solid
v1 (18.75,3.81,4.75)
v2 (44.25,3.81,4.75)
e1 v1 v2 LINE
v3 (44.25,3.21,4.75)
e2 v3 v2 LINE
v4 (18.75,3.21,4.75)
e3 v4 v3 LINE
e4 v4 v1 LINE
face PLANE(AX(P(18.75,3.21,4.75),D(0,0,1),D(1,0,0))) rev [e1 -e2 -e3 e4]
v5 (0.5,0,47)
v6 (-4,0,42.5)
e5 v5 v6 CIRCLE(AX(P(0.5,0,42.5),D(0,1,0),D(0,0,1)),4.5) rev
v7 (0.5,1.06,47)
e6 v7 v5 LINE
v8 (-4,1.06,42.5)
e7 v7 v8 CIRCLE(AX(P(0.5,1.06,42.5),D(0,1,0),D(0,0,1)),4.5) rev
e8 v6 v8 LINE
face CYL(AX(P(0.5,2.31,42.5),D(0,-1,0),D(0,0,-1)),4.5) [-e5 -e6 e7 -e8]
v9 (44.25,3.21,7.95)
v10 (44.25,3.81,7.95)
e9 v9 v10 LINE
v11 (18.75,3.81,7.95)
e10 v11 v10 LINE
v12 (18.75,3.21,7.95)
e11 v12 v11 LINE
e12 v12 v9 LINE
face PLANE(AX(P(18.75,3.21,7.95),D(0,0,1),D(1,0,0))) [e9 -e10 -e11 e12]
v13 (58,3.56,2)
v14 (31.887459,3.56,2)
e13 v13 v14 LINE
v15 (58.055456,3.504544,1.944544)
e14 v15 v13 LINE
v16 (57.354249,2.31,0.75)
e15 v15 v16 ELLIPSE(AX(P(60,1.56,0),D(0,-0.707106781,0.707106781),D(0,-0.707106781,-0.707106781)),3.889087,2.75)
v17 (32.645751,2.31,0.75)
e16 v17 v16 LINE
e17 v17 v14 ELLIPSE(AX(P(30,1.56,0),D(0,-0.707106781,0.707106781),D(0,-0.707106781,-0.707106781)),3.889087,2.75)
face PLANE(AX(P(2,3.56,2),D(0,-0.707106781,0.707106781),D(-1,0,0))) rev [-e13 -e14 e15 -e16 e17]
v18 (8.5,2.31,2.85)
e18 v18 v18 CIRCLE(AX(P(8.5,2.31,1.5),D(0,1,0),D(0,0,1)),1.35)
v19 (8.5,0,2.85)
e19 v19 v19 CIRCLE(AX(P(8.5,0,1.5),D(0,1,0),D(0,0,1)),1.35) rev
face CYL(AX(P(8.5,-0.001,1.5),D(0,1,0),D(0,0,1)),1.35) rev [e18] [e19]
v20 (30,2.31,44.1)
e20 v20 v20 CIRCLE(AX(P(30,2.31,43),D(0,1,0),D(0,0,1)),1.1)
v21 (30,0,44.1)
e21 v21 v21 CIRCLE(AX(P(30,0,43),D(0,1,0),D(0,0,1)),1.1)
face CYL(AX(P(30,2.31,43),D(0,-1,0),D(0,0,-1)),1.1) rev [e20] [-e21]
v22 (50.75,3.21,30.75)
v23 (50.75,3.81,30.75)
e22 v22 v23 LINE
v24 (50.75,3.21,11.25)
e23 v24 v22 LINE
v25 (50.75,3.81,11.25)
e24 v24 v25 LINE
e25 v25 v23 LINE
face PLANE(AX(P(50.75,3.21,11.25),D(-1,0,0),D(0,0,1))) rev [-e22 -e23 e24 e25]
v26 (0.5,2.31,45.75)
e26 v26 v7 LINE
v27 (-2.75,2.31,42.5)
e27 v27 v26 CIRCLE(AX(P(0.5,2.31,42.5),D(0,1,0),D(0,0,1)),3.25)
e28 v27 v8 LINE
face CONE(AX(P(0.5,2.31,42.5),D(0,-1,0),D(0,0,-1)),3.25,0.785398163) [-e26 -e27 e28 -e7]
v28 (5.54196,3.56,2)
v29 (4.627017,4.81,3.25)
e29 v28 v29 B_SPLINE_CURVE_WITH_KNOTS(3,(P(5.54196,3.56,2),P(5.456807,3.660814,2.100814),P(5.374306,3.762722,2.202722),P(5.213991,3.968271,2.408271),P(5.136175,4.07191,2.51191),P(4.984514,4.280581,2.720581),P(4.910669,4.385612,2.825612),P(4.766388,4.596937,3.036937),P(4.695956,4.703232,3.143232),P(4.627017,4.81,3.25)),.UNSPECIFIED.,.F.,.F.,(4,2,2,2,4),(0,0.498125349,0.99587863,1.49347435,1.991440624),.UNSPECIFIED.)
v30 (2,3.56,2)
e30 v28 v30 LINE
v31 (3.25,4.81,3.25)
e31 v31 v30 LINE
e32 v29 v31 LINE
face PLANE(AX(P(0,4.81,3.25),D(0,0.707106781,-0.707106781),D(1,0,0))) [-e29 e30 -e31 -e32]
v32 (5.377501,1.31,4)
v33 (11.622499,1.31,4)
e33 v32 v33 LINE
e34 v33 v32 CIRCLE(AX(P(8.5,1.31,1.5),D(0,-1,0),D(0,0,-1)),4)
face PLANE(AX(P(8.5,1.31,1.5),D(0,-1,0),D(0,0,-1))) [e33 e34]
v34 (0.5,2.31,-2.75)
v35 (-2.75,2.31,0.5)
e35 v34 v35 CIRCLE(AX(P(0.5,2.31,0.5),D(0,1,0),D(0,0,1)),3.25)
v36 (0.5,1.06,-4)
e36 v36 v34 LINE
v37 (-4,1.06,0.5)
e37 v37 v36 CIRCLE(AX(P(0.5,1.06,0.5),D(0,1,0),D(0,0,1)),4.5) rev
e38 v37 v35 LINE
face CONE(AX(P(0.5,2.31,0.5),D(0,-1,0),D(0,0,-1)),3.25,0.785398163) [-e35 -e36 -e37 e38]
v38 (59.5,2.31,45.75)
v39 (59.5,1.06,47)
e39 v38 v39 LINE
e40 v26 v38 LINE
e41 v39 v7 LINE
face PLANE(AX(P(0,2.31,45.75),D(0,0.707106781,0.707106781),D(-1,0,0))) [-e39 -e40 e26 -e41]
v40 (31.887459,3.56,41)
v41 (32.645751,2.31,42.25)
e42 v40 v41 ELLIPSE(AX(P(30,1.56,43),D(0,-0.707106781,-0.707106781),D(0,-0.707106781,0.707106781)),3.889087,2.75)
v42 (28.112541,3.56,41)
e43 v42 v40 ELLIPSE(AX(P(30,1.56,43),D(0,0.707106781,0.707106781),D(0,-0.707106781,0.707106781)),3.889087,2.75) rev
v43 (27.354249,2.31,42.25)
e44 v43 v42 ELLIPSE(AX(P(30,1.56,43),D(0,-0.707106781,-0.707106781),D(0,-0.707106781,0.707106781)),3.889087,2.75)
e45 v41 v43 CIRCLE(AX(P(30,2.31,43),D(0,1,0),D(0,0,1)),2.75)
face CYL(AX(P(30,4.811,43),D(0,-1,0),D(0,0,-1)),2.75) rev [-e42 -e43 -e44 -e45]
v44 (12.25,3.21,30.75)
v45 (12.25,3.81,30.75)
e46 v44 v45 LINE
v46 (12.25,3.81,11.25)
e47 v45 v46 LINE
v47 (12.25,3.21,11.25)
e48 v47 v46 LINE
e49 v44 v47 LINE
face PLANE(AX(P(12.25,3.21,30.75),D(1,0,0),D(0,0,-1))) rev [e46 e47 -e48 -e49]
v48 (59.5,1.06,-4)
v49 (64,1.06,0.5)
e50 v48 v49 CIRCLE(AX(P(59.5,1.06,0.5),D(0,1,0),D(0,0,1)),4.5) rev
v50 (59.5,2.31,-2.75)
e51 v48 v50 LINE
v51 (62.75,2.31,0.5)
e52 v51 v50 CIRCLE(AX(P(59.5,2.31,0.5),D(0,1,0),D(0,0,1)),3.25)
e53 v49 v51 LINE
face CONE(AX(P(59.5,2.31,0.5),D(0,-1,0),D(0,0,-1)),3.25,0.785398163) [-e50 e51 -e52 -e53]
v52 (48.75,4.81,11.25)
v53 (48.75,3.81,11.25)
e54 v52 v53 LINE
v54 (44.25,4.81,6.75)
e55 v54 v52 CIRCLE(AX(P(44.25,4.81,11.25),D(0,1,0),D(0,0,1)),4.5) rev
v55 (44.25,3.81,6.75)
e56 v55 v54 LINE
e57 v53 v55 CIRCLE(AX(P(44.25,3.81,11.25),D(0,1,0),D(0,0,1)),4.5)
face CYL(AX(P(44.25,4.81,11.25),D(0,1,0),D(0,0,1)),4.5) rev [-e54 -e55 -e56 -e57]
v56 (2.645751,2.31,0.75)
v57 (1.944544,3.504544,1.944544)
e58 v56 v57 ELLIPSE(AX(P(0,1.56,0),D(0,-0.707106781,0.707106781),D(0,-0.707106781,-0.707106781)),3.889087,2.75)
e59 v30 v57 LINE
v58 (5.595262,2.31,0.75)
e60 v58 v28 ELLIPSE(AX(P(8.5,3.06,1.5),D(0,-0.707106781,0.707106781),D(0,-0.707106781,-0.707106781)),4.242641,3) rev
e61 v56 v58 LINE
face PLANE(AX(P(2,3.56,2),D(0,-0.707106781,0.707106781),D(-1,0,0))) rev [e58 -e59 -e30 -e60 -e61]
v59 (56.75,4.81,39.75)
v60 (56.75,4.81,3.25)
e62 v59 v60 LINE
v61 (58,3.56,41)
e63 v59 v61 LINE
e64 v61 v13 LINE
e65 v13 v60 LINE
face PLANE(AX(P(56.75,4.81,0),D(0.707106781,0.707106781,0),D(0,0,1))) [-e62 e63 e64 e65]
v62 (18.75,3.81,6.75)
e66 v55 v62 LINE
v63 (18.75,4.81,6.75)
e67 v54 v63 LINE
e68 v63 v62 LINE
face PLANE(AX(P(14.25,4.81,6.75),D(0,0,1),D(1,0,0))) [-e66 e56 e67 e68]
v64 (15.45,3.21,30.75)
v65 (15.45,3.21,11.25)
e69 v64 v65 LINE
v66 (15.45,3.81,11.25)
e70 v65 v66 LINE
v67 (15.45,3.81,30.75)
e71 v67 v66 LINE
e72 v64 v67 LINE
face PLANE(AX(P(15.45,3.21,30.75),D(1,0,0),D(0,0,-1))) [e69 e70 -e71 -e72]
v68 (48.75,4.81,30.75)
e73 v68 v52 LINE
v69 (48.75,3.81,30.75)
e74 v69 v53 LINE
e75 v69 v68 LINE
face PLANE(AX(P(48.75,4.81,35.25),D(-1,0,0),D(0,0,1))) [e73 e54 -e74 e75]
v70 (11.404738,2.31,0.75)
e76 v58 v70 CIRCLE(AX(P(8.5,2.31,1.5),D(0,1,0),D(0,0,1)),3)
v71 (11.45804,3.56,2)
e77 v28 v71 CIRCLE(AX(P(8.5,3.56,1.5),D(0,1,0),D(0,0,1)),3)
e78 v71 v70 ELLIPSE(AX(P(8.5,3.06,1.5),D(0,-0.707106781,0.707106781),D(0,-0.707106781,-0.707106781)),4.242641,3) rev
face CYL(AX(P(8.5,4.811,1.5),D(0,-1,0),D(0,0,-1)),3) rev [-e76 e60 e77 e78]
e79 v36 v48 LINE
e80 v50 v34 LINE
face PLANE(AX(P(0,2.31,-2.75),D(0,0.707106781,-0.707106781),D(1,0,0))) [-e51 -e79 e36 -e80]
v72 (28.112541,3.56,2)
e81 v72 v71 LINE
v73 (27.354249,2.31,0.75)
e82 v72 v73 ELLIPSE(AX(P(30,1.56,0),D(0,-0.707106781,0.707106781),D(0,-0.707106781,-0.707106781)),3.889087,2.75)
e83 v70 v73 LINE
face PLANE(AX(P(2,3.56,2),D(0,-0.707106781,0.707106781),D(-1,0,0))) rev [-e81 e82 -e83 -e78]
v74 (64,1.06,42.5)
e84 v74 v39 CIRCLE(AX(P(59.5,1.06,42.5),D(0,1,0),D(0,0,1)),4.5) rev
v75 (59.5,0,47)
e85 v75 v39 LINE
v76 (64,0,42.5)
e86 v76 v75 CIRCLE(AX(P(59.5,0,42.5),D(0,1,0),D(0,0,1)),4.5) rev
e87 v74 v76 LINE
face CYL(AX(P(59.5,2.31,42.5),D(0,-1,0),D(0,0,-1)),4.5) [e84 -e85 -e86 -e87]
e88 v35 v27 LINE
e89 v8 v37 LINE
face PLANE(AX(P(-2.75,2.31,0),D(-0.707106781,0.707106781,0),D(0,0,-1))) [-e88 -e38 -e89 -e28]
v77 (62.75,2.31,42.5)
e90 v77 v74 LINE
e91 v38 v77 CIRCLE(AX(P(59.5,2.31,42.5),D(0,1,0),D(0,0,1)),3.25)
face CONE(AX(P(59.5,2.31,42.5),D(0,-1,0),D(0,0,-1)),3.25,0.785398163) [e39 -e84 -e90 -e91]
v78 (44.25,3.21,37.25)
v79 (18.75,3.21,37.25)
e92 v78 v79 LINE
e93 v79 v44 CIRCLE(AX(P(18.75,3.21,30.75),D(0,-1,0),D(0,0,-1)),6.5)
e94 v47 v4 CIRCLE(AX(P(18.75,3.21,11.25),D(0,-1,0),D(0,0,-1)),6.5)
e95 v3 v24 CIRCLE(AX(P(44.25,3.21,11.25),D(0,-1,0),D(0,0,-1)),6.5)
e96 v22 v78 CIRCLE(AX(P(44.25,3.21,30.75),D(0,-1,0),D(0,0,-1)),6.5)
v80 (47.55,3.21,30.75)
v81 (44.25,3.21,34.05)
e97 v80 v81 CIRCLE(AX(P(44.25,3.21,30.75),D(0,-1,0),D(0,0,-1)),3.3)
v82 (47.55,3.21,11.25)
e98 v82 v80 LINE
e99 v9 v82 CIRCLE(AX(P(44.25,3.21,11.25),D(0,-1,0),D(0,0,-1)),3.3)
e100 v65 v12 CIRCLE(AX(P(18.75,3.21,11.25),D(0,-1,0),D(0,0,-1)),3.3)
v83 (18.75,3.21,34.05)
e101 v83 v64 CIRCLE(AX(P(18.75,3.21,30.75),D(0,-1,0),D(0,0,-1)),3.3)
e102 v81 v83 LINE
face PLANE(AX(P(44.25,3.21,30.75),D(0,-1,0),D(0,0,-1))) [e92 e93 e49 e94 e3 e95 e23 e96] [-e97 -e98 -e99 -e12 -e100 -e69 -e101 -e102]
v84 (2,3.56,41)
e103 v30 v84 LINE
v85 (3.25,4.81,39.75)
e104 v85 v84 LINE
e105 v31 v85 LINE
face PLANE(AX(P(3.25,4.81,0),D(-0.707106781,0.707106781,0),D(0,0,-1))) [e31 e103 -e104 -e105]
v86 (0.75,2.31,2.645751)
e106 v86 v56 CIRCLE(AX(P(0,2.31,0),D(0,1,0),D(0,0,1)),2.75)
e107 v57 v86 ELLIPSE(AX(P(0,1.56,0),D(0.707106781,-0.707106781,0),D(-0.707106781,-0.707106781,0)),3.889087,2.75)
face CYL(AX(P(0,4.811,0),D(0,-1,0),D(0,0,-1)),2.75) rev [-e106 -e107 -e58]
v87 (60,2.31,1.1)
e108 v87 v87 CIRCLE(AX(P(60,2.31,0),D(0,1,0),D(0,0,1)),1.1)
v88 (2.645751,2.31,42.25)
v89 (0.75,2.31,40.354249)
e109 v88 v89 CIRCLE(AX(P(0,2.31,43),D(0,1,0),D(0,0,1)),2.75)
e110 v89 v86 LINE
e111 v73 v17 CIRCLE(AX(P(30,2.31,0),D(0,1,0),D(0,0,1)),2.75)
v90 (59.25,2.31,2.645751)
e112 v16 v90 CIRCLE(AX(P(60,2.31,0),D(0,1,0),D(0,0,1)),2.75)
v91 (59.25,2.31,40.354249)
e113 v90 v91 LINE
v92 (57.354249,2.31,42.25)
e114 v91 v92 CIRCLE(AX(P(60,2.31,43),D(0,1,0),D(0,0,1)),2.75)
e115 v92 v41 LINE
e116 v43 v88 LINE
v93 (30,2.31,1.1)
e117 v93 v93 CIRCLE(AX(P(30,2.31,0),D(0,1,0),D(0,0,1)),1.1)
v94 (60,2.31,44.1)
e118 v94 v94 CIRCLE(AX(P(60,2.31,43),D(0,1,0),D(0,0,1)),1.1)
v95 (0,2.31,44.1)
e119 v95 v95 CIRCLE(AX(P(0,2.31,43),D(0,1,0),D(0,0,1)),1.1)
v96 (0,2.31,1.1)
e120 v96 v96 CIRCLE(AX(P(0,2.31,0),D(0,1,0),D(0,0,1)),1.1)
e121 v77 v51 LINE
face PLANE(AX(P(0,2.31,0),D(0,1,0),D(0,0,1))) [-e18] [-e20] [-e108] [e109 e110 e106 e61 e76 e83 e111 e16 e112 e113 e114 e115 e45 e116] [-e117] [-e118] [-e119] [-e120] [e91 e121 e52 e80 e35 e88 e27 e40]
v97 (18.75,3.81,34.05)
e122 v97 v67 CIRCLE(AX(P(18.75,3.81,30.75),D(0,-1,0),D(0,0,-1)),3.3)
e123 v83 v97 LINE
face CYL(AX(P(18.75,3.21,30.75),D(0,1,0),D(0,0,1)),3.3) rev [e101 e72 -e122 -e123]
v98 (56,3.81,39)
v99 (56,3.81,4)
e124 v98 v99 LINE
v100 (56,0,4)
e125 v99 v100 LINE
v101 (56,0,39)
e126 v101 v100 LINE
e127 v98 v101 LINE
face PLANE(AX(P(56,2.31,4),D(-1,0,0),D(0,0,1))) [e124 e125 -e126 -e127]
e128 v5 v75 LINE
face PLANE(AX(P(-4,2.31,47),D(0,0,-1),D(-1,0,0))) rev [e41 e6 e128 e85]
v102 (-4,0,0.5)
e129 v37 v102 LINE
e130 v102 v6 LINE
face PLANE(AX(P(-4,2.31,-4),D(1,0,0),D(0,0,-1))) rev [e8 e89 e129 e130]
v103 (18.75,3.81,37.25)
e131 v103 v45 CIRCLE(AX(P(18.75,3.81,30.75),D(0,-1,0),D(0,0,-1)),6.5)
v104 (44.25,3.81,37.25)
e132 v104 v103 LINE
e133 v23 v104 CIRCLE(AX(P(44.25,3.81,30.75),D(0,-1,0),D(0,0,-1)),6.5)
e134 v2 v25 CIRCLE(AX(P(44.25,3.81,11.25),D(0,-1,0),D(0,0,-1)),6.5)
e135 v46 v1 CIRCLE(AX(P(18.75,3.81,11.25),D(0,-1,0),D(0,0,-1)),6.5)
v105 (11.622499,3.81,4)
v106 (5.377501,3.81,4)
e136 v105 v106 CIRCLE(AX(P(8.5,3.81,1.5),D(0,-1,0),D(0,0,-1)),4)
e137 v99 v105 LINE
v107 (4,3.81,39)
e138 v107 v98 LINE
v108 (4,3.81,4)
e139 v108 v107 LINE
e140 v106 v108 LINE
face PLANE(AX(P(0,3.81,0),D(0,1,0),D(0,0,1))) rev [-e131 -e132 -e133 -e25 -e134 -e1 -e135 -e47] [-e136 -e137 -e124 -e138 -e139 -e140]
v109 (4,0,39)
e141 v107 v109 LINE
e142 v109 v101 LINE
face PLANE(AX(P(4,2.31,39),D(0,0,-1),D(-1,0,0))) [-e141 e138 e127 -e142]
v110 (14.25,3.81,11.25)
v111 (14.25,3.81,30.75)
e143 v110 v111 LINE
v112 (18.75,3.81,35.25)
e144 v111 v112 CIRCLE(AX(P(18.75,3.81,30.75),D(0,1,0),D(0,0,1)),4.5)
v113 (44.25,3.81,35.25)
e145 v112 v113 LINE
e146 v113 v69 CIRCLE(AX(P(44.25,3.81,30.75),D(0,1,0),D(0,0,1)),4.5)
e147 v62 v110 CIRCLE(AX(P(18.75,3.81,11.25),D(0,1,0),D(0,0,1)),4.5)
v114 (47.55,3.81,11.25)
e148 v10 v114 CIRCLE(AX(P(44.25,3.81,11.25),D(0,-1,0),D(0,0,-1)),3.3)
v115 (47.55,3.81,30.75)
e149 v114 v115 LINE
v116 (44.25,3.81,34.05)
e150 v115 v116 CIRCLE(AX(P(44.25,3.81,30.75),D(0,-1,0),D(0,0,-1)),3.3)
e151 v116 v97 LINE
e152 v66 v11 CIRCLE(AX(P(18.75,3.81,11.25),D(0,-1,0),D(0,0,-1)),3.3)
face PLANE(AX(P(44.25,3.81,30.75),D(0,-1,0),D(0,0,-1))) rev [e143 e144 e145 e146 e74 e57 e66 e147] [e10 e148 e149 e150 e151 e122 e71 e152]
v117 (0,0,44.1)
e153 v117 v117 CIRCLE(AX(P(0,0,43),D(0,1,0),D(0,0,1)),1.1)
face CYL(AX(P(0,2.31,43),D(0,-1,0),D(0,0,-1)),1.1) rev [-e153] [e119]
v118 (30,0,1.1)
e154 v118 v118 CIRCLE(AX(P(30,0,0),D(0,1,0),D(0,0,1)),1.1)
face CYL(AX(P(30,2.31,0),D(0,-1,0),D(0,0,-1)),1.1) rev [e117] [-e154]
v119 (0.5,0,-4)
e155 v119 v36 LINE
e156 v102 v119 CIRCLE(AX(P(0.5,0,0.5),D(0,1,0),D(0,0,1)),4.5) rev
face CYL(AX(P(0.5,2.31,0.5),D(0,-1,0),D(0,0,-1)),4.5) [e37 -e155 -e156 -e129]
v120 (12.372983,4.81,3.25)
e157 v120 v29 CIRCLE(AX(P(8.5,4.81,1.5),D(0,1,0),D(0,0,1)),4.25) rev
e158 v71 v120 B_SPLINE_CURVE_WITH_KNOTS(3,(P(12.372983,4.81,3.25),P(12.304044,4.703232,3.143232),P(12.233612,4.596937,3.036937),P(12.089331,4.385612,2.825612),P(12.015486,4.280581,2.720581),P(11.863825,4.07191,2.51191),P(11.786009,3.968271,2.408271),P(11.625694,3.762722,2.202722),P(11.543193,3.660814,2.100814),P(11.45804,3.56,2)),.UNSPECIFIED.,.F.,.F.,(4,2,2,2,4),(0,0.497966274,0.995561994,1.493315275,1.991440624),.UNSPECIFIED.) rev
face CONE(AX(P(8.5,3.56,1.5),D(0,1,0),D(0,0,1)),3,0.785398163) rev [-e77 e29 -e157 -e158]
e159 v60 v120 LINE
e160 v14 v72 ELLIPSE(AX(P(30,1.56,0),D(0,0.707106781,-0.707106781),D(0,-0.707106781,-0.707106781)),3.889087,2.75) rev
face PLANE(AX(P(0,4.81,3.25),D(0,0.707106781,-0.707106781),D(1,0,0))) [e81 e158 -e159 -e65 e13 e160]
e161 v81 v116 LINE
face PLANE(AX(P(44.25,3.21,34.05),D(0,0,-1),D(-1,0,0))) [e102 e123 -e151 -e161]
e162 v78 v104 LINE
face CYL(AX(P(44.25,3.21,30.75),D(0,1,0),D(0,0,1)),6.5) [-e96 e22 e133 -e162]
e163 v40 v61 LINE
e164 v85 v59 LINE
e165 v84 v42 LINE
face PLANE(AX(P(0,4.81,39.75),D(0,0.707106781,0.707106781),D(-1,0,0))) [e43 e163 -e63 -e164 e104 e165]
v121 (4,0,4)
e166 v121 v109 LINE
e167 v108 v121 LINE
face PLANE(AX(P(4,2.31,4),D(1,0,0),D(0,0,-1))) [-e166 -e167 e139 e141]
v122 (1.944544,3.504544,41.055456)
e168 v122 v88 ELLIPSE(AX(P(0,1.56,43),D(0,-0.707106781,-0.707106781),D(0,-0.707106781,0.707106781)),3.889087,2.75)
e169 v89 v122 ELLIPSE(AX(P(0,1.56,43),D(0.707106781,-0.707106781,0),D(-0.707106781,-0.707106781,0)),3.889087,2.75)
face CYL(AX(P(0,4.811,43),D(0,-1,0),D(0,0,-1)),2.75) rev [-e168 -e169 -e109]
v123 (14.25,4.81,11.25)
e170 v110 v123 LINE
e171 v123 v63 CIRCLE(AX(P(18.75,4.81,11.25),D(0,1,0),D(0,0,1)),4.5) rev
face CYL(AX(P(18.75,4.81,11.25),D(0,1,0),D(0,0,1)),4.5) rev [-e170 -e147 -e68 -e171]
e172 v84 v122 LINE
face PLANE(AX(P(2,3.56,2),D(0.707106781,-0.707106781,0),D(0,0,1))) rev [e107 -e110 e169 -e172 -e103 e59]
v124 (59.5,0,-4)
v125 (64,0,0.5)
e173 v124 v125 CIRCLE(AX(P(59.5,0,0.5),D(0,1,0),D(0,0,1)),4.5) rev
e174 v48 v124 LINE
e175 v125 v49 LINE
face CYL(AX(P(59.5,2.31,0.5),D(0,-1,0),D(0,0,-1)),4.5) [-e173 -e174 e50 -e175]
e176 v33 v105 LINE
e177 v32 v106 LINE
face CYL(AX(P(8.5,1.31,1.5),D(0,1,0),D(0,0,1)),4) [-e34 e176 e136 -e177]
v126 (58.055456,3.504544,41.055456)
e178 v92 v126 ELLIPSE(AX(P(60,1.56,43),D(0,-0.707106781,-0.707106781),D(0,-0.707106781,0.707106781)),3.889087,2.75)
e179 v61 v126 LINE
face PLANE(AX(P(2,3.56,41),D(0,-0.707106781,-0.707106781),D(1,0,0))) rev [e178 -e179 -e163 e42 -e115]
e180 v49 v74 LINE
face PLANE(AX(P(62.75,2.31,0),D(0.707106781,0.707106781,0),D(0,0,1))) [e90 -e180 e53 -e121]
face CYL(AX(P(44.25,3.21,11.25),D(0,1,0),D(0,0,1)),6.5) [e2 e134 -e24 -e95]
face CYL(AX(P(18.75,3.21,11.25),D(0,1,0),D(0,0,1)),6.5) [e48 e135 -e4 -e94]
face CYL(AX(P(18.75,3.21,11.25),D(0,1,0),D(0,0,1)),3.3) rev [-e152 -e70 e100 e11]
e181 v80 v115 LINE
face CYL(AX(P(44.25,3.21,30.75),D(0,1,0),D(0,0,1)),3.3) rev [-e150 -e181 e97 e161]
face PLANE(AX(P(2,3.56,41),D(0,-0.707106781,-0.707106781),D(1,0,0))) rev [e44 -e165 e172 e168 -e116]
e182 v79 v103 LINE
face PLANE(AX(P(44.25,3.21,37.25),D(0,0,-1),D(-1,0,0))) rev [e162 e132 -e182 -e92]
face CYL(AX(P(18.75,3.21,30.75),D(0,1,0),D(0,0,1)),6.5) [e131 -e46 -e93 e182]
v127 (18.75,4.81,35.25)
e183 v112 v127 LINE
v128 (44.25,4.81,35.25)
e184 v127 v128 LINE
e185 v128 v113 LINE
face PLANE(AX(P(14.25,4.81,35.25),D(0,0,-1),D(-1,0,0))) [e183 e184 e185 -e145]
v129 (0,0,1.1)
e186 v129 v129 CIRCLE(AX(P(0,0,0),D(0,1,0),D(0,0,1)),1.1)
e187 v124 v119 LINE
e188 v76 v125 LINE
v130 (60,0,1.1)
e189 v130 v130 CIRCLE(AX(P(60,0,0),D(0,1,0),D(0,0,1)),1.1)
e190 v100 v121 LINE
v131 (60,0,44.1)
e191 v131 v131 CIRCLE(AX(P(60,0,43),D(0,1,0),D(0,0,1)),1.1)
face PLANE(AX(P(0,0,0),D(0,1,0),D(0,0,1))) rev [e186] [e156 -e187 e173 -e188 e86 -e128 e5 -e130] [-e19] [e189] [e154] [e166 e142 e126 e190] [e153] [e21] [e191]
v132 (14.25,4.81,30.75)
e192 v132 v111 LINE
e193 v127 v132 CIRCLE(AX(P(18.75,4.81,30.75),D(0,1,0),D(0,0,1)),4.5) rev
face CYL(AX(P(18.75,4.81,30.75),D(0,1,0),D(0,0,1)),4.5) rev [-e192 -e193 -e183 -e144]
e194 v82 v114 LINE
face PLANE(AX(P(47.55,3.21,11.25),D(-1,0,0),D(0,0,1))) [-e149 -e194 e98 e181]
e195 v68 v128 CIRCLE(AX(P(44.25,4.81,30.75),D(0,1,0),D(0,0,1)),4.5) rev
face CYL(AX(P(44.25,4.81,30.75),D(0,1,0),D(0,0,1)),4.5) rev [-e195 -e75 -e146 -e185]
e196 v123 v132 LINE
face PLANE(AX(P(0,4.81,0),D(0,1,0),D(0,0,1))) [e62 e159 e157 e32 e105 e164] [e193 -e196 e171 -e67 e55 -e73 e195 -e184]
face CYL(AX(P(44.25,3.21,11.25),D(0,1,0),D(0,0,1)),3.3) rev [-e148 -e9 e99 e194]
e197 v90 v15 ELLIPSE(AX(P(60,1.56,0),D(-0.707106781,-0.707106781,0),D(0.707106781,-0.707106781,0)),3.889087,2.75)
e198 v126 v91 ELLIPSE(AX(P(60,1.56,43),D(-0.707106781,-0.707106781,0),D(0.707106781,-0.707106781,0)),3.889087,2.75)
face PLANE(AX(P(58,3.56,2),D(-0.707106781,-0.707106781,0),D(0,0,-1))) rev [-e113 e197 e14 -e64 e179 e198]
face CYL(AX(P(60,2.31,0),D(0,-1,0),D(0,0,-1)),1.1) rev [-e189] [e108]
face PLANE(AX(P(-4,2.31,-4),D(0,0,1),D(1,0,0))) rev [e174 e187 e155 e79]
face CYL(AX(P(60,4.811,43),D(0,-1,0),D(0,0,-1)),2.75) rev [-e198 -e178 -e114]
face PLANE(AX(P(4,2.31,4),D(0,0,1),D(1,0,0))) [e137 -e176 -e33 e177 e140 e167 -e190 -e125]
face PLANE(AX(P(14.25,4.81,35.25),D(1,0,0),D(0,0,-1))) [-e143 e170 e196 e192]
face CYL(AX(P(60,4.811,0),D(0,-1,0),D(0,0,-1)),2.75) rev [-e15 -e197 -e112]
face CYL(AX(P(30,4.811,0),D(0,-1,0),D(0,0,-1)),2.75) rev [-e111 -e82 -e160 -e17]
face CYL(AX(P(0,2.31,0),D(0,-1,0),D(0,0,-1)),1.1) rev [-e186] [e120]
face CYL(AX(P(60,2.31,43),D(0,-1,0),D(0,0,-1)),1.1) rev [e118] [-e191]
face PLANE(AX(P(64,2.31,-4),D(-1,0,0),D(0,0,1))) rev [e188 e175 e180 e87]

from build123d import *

# Parameters (mm, degrees)
SKETCH_1_W          = 68
SKETCH_1_H          = 51
SKETCH_1_R          = 1.1
SKETCH_1_W_2        = 52
SKETCH_1_H_2        = 35
EXTRUDE_1_DEPTH     = 2.31
SKETCH_2_W          = 56
SKETCH_2_H          = 39
SKETCH_2_W_2        = 52
SKETCH_2_H_2        = 35
EXTRUDE_2_DEPTH     = 1.5
CUT_EXTRUDE_1_REACH = 81.438
SKETCH_3_R          = 1.35
SKETCH_4_W          = 56
SKETCH_4_H          = 39
SKETCH_4_W_2        = 34.5
SKETCH_4_H_2        = 28.5
EXTRUDE_3_DEPTH     = 1
CUT_EXTRUDE_2_REACH = 81.443
SKETCH_5_R          = 3
EXTRUDE_START       = 2.5
EXTRUDE_4_DEPTH     = 2.5
EXTRUDE_5_DEPTH     = 1
FILLET_1_R          = 4.5
CHAMFER_1_SIZE      = 1.25
CUT_EXTRUDE_3_REACH = 81.443
SKETCH_9_R          = 2.75
EXTRUDE_6_DEPTH     = 0.6


with BuildPart() as part:
    # 草图1 → 凸台-拉伸1 (new body)
    with BuildSketch(Plane(origin=(0, 0, 0), x_dir=(1, 0, 0), z_dir=(0, 1, 0))):
        with Locations((30, -21.5)):
            Rectangle(SKETCH_1_W, SKETCH_1_H)
        with Locations(Location((0, 0, 0), (0, 0, 270))):
            Circle(SKETCH_1_R, mode=Mode.SUBTRACT)
        with Locations(Location((60, 0, 0), (0, 0, 270))):
            Circle(SKETCH_1_R, mode=Mode.SUBTRACT)
        with Locations(Location((30, 0, 0), (0, 0, 270))):
            Circle(SKETCH_1_R, mode=Mode.SUBTRACT)
        with Locations(Location((0, -43, 0), (0, 0, 270))):
            Circle(SKETCH_1_R, mode=Mode.SUBTRACT)
        with Locations(Location((60, -43, 0), (0, 0, 270))):
            Circle(SKETCH_1_R, mode=Mode.SUBTRACT)
        with Locations(Location((30, -43, 0), (0, 0, 270))):
            Circle(SKETCH_1_R, mode=Mode.SUBTRACT)
        with Locations((30, -21.5)):
            Rectangle(SKETCH_1_W_2, SKETCH_1_H_2, mode=Mode.SUBTRACT)
    extrude(amount=EXTRUDE_1_DEPTH)

    # 草图2 → 凸台-拉伸2 (add)
    with BuildSketch(Plane(origin=(0, 2.31, 0), x_dir=(1, 0, 0), z_dir=(0, 1, 0))):
        with Locations((30, -21.5)):
            Rectangle(SKETCH_2_W, SKETCH_2_H)
        with Locations((30, -21.5)):
            Rectangle(SKETCH_2_W_2, SKETCH_2_H_2, mode=Mode.SUBTRACT)
    extrude(amount=EXTRUDE_2_DEPTH)

    # 草图3 → 切除-拉伸1 (cut, up to next)
    with BuildSketch(Plane(origin=(0, 2.31, 0), x_dir=(1, 0, 0), z_dir=(0, 1, 0)), mode=Mode.PRIVATE) as cut_extrude_1_sk1:
        with Locations(Location((8.5, -1.5, 0), (0, 0, 270))):
            Circle(SKETCH_3_R)
    cut_extrude_1_tool1 = extrude(cut_extrude_1_sk1.sketch, amount=-CUT_EXTRUDE_1_REACH, mode=Mode.PRIVATE) & part.part
    add(cut_extrude_1_tool1.solids().sort_by_distance((8.5, 2.31, 1.5))[0], mode=Mode.SUBTRACT)

    # 草图4 → 凸台-拉伸3 (add)
    with BuildSketch(Plane(origin=(0, 3.81, 0), x_dir=(1, 0, 0), z_dir=(0, 1, 0))):
        with Locations((30, -21.5)):
            Rectangle(SKETCH_4_W, SKETCH_4_H)
        with Locations((31.5, -21)):
            Rectangle(SKETCH_4_W_2, SKETCH_4_H_2, mode=Mode.SUBTRACT)
    extrude(amount=EXTRUDE_3_DEPTH)

    # 草图5 → 切除-拉伸2 (cut, up to next)
    with BuildSketch(Plane(origin=(0, 2.31, 0), x_dir=(1, 0, 0), z_dir=(0, 1, 0)), mode=Mode.PRIVATE) as cut_extrude_2_sk1:
        with Locations((8.5, -1.5)):
            Circle(SKETCH_5_R)
    cut_extrude_2_tool1 = extrude(cut_extrude_2_sk1.sketch, amount=CUT_EXTRUDE_2_REACH, mode=Mode.PRIVATE) & part.part
    add(cut_extrude_2_tool1.solids().sort_by_distance((8.5, 2.31, 1.5))[0], mode=Mode.SUBTRACT)

    # 草图6 → 凸台-拉伸4 (add)
    with BuildSketch(Plane.XZ.offset(-3.81).offset(EXTRUDE_START)):
        with BuildLine():
            Line((5.377501001, 4), (6.841687605, 4))
            ThreePointArc((6.841687605, 4), (8.5, 4.5), (10.158312395, 4))
            Line((10.158312395, 4), (11.622498999, 4))
            ThreePointArc((11.622498999, 4), (8.5, 5.5), (5.377501001, 4))
        make_face()
    extrude(amount=-EXTRUDE_4_DEPTH)

    # 草图7 → 凸台-拉伸5 (add)
    with BuildSketch(Plane.XZ.offset(-1.31)):
        with BuildLine():
            Line((5.377501001, 4), (11.622498999, 4))
            ThreePointArc((11.622498999, 4), (8.5, 5.5), (5.377501001, 4))
        make_face()
    extrude(amount=-EXTRUDE_5_DEPTH)

    # 圆角1
    fillet_1_edges = [part.edges().sort_by_distance(p)[0] for p in [
        (-4, 1.155, -4),
        (64, 1.155, -4),
        (64, 1.155, 47),
        (-4, 1.155, 47),
        (14.25, 4.31, 35.25),
        (48.75, 4.31, 35.25),
        (48.75, 4.31, 6.75),
        (14.25, 4.31, 6.75),
    ]]
    fillet(fillet_1_edges, radius=FILLET_1_R)

    # 倒角1
    # the kernel refuses this chamfer: 1.25 mm, written as the material it adds along each edge
    with BuildSketch(Plane(origin=(2, 2.31, 2), x_dir=(0, 0, -1), z_dir=(1, 0, 0))) as chamfer_1_piece_1_section:
        Polygon((CHAMFER_1_SIZE, 0), (0, CHAMFER_1_SIZE), (0, 0), align=None)
    chamfer_1_piece_1 = extrude(amount=6.756563843, mode=Mode.PRIVATE)
    chamfer_1_piece_1 = chamfer_1_piece_1 - Plane(origin=(8.5, 2.31, 1.5), x_dir=(1, 0, 0), z_dir=(0, -1, 0)) * Cylinder(3, 19, mode=Mode.PRIVATE)
    add(chamfer_1_piece_1)
    with BuildSketch(Plane(origin=(8.243436157, 2.31, 2), x_dir=(0, 0, -1), z_dir=(1, 0, 0))) as chamfer_1_piece_2_section:
        Polygon((CHAMFER_1_SIZE, 0), (0, CHAMFER_1_SIZE), (0, 0), align=None)
    chamfer_1_piece_2 = extrude(amount=49.756563843, mode=Mode.PRIVATE)
    chamfer_1_piece_2 = chamfer_1_piece_2 - Plane(origin=(30, 2.31, 0), x_dir=(0, 0, 1), z_dir=(0, -1, 0)) * Cylinder(1.1, 105, mode=Mode.PRIVATE)
    chamfer_1_piece_2 = chamfer_1_piece_2 - Plane(origin=(8.5, 2.31, 1.5), x_dir=(1, 0, 0), z_dir=(0, -1, 0)) * Cylinder(3, 105, mode=Mode.PRIVATE)
    add(chamfer_1_piece_2)
    with BuildSketch(Plane(origin=(2, 2.31, 41), x_dir=(-1, 0, 0), z_dir=(0, 0, -1)), Plane(origin=(58, 2.31, 2), x_dir=(1, 0, 0), z_dir=(0, 0, 1))) as chamfer_1_piece_3:
        Polygon((CHAMFER_1_SIZE, 0), (0, CHAMFER_1_SIZE), (0, 0), align=None)
    extrude(amount=39)
    with BuildSketch(Plane(origin=(58, 2.31, 41), x_dir=(0, 0, 1), z_dir=(-1, 0, 0))) as chamfer_1_piece_4_section:
        Polygon((CHAMFER_1_SIZE, 0), (0, CHAMFER_1_SIZE), (0, 0), align=None)
    chamfer_1_piece_4 = extrude(amount=56, mode=Mode.PRIVATE)
    chamfer_1_piece_4 = chamfer_1_piece_4 - Plane(origin=(30, 2.31, 43), x_dir=(0, 0, 1), z_dir=(0, -1, 0)) * Cylinder(1.1, 118, mode=Mode.PRIVATE)
    add(chamfer_1_piece_4)
    with BuildSketch(Plane(origin=(-1.214603735, 2.31, 2), x_dir=(0, 0, -1), z_dir=(1, 0, 0))) as chamfer_1_piece_5a_section:
        Polygon((CHAMFER_1_SIZE, 0), (0, CHAMFER_1_SIZE), (0, 0), align=None)
    chamfer_1_piece_5a = extrude(amount=9.971167578, mode=Mode.PRIVATE)
    chamfer_1_piece_5a = chamfer_1_piece_5a - Plane(origin=(0, 2.31, 0), x_dir=(0, 0, 1), z_dir=(0, -1, 0)) * Cylinder(1.1, 25, mode=Mode.PRIVATE)
    chamfer_1_piece_5a = split(chamfer_1_piece_5a, bisect_by=Plane(origin=(2, 2.31, 2), z_dir=(-1, 0, 0)), keep=Keep.TOP, mode=Mode.PRIVATE)
    with BuildSketch(Plane(origin=(2, 2.31, 41), x_dir=(-1, 0, 0), z_dir=(0, 0, -1))) as chamfer_1_piece_5b_section:
        Polygon((CHAMFER_1_SIZE, 0), (0, CHAMFER_1_SIZE), (0, 0), align=None)
    chamfer_1_piece_5b = extrude(amount=42.214603735, mode=Mode.PRIVATE)
    chamfer_1_piece_5b = chamfer_1_piece_5b - Plane(origin=(0, 2.31, 0), x_dir=(0, 0, 1), z_dir=(0, -1, 0)) * Cylinder(1.1, 90, mode=Mode.PRIVATE)
    chamfer_1_piece_5b = split(chamfer_1_piece_5b, bisect_by=Plane(origin=(2, 2.31, 2), z_dir=(0, 0, -1)), keep=Keep.TOP, mode=Mode.PRIVATE)
    chamfer_1_piece_5 = chamfer_1_piece_5a & chamfer_1_piece_5b
    add(chamfer_1_piece_5)
    with BuildSketch(Plane(origin=(58, 2.31, -1.214603735), x_dir=(1, 0, 0), z_dir=(0, 0, 1))) as chamfer_1_piece_6a_section:
        Polygon((CHAMFER_1_SIZE, 0), (0, CHAMFER_1_SIZE), (0, 0), align=None)
    chamfer_1_piece_6a = extrude(amount=42.214603735, mode=Mode.PRIVATE)
    chamfer_1_piece_6a = chamfer_1_piece_6a - Plane(origin=(60, 2.31, 0), x_dir=(0, 0, 1), z_dir=(0, -1, 0)) * Cylinder(1.1, 90, mode=Mode.PRIVATE)
    chamfer_1_piece_6a = split(chamfer_1_piece_6a, bisect_by=Plane(origin=(58, 2.31, 2), z_dir=(0, 0, -1)), keep=Keep.TOP, mode=Mode.PRIVATE)
    with BuildSketch(Plane(origin=(8.243436157, 2.31, 2), x_dir=(0, 0, -1), z_dir=(1, 0, 0))) as chamfer_1_piece_6b_section:
        Polygon((CHAMFER_1_SIZE, 0), (0, CHAMFER_1_SIZE), (0, 0), align=None)
    chamfer_1_piece_6b = extrude(amount=52.971167578, mode=Mode.PRIVATE)
    chamfer_1_piece_6b = chamfer_1_piece_6b - Plane(origin=(60, 2.31, 0), x_dir=(0, 0, 1), z_dir=(0, -1, 0)) * Cylinder(1.1, 111, mode=Mode.PRIVATE)
    chamfer_1_piece_6b = split(chamfer_1_piece_6b, bisect_by=Plane(origin=(58, 2.31, 2), z_dir=(1, 0, 0)), keep=Keep.TOP, mode=Mode.PRIVATE)
    chamfer_1_piece_6 = chamfer_1_piece_6a & chamfer_1_piece_6b
    add(chamfer_1_piece_6)
    with BuildSketch(Plane(origin=(2, 2.31, 44.214603735), x_dir=(-1, 0, 0), z_dir=(0, 0, -1))) as chamfer_1_piece_7a_section:
        Polygon((CHAMFER_1_SIZE, 0), (0, CHAMFER_1_SIZE), (0, 0), align=None)
    chamfer_1_piece_7a = extrude(amount=42.214603735, mode=Mode.PRIVATE)
    chamfer_1_piece_7a = chamfer_1_piece_7a - Plane(origin=(0, 2.31, 43), x_dir=(0, 0, 1), z_dir=(0, -1, 0)) * Cylinder(1.1, 90, mode=Mode.PRIVATE)
    chamfer_1_piece_7a = split(chamfer_1_piece_7a, bisect_by=Plane(origin=(2, 2.31, 41), z_dir=(0, 0, 1)), keep=Keep.TOP, mode=Mode.PRIVATE)
    with BuildSketch(Plane(origin=(58, 2.31, 41), x_dir=(0, 0, 1), z_dir=(-1, 0, 0))) as chamfer_1_piece_7b_section:
        Polygon((CHAMFER_1_SIZE, 0), (0, CHAMFER_1_SIZE), (0, 0), align=None)
    chamfer_1_piece_7b = extrude(amount=59.214603735, mode=Mode.PRIVATE)
    chamfer_1_piece_7b = chamfer_1_piece_7b - Plane(origin=(0, 2.31, 43), x_dir=(0, 0, 1), z_dir=(0, -1, 0)) * Cylinder(1.1, 124, mode=Mode.PRIVATE)
    chamfer_1_piece_7b = split(chamfer_1_piece_7b, bisect_by=Plane(origin=(2, 2.31, 41), z_dir=(-1, 0, 0)), keep=Keep.TOP, mode=Mode.PRIVATE)
    chamfer_1_piece_7 = chamfer_1_piece_7a & chamfer_1_piece_7b
    add(chamfer_1_piece_7)
    with BuildSketch(Plane(origin=(61.214603735, 2.31, 41), x_dir=(0, 0, 1), z_dir=(-1, 0, 0))) as chamfer_1_piece_8a_section:
        Polygon((CHAMFER_1_SIZE, 0), (0, CHAMFER_1_SIZE), (0, 0), align=None)
    chamfer_1_piece_8a = extrude(amount=59.214603735, mode=Mode.PRIVATE)
    chamfer_1_piece_8a = chamfer_1_piece_8a - Plane(origin=(60, 2.31, 43), x_dir=(0, 0, 1), z_dir=(0, -1, 0)) * Cylinder(1.1, 124, mode=Mode.PRIVATE)
    chamfer_1_piece_8a = split(chamfer_1_piece_8a, bisect_by=Plane(origin=(58, 2.31, 41), z_dir=(1, 0, 0)), keep=Keep.TOP, mode=Mode.PRIVATE)
    with BuildSketch(Plane(origin=(58, 2.31, 2), x_dir=(1, 0, 0), z_dir=(0, 0, 1))) as chamfer_1_piece_8b_section:
        Polygon((CHAMFER_1_SIZE, 0), (0, CHAMFER_1_SIZE), (0, 0), align=None)
    chamfer_1_piece_8b = extrude(amount=42.214603735, mode=Mode.PRIVATE)
    chamfer_1_piece_8b = chamfer_1_piece_8b - Plane(origin=(60, 2.31, 43), x_dir=(0, 0, 1), z_dir=(0, -1, 0)) * Cylinder(1.1, 90, mode=Mode.PRIVATE)
    chamfer_1_piece_8b = split(chamfer_1_piece_8b, bisect_by=Plane(origin=(58, 2.31, 41), z_dir=(0, 0, 1)), keep=Keep.TOP, mode=Mode.PRIVATE)
    chamfer_1_piece_8 = chamfer_1_piece_8a & chamfer_1_piece_8b
    add(chamfer_1_piece_8)
    # the kernel refuses this chamfer: 1.25 mm, written as the material it takes off along each edge
    with BuildSketch(Plane(origin=(58, 4.81, 44.214603735), x_dir=(-1, 0, 0), z_dir=(0, 0, -1)), Plane(origin=(2, 4.81, -1.214603735), x_dir=(1, 0, 0), z_dir=(0, 0, 1))) as chamfer_1_2_piece_1:
        Polygon((CHAMFER_1_SIZE, 0), (0, -CHAMFER_1_SIZE), (0, 0), align=None)
    extrude(amount=45.42920747, mode=Mode.SUBTRACT)
    with BuildSketch(Plane(origin=(-1.214603735, 4.81, 41), x_dir=(0, -1, 0), z_dir=(1, 0, 0))) as chamfer_1_2_piece_2:
        Polygon((CHAMFER_1_SIZE, 0), (0, CHAMFER_1_SIZE), (0, 0), align=None)
    extrude(amount=62.42920747, mode=Mode.SUBTRACT)
    with BuildSketch(Plane(origin=(8.756563843, 4.81, 2), x_dir=(0, 0, 1), z_dir=(-1, 0, 0))) as chamfer_1_2_piece_3:
        Polygon((CHAMFER_1_SIZE, 0), (0, -CHAMFER_1_SIZE), (0, 0), align=None)
    extrude(amount=9.971167578, mode=Mode.SUBTRACT)
    with BuildSketch(Plane(origin=(61.214603735, 4.81, 2), x_dir=(0, 0, 1), z_dir=(-1, 0, 0))) as chamfer_1_2_piece_4:
        Polygon((CHAMFER_1_SIZE, 0), (0, -CHAMFER_1_SIZE), (0, 0), align=None)
    extrude(amount=52.971167578, mode=Mode.SUBTRACT)
    with BuildSketch(Plane(origin=(8.5, 4.81, 1.5), x_dir=(0.6173224971871656, 0, -0.7867101972560174), z_dir=(-0.7867101972560174, 0, -0.6173224971871656))) as chamfer_1_2_piece_5:
        Polygon((3 + CHAMFER_1_SIZE, 0), (3, CHAMFER_1_SIZE), (3, 0), align=None)
    revolve(axis=Axis((8.5, 4.81, 1.5), (0, -1, 0)), revolution_arc=283.758256834, mode=Mode.SUBTRACT)
    with BuildSketch(Plane(origin=(64, 2.31, 0.5), x_dir=(-1, 0, 0), z_dir=(0, 0, 1)), Plane(origin=(-4, 2.31, 42.5), x_dir=(1, 0, 0), z_dir=(0, 0, -1))) as chamfer_1_2_piece_6:
        Polygon((CHAMFER_1_SIZE, 0), (0, CHAMFER_1_SIZE), (0, 0), align=None)
    extrude(amount=42, mode=Mode.SUBTRACT)
    with BuildSketch(Plane(origin=(59.5, 2.31, 0.5), x_dir=(0, 0, -1), z_dir=(-1, 0, 0))) as chamfer_1_2_piece_7:
        Polygon((4.5 - CHAMFER_1_SIZE, 0), (4.5, CHAMFER_1_SIZE), (4.5, 0), align=None)
    revolve(axis=Axis((59.5, 2.31, 0.5), (0, -1, 0)), revolution_arc=90, mode=Mode.SUBTRACT)
    with BuildSketch(Plane(origin=(59.5, 2.31, 42.5), x_dir=(0, 0, 1), z_dir=(-1, 0, 0))) as chamfer_1_2_piece_8:
        Polygon((4.5 - CHAMFER_1_SIZE, 0), (4.5, -CHAMFER_1_SIZE), (4.5, 0), align=None)
    revolve(axis=Axis((59.5, 2.31, 42.5), (0, 1, 0)), revolution_arc=90, mode=Mode.SUBTRACT)
    with BuildSketch(Plane(origin=(0.5, 2.31, -4), x_dir=(0, -1, 0), z_dir=(1, 0, 0))) as chamfer_1_2_piece_9:
        Polygon((CHAMFER_1_SIZE, 0), (0, -CHAMFER_1_SIZE), (0, 0), align=None)
    extrude(amount=59, mode=Mode.SUBTRACT)
    with BuildSketch(Plane(origin=(59.5, 2.31, 47), x_dir=(0, 0, -1), z_dir=(-1, 0, 0))) as chamfer_1_2_piece_10:
        Polygon((CHAMFER_1_SIZE, 0), (0, CHAMFER_1_SIZE), (0, 0), align=None)
    extrude(amount=59, mode=Mode.SUBTRACT)
    with BuildSketch(Plane(origin=(0.5, 2.31, 0.5), x_dir=(0, 0, -1), z_dir=(1, 0, 0))) as chamfer_1_2_piece_11:
        Polygon((4.5 - CHAMFER_1_SIZE, 0), (4.5, -CHAMFER_1_SIZE), (4.5, 0), align=None)
    revolve(axis=Axis((0.5, 2.31, 0.5), (0, 1, 0)), revolution_arc=90, mode=Mode.SUBTRACT)
    with BuildSketch(Plane(origin=(0.5, 2.31, 42.5), x_dir=(0, 0, 1), z_dir=(1, 0, 0))) as chamfer_1_2_piece_12:
        Polygon((4.5 - CHAMFER_1_SIZE, 0), (4.5, CHAMFER_1_SIZE), (4.5, 0), align=None)
    revolve(axis=Axis((0.5, 2.31, 42.5), (0, -1, 0)), revolution_arc=90, mode=Mode.SUBTRACT)

    # 草图9 → 切除-拉伸3 (cut, up to next)
    with BuildSketch(Plane(origin=(0, 2.31, 0), x_dir=(1, 0, 0), z_dir=(0, 1, 0)), mode=Mode.PRIVATE) as cut_extrude_3_sk1:
        Circle(SKETCH_9_R)
    cut_extrude_3_tool1 = extrude(cut_extrude_3_sk1.sketch, amount=CUT_EXTRUDE_3_REACH, mode=Mode.PRIVATE) & part.part
    # 草图9 → 切除-拉伸3 (cut, up to next)
    with BuildSketch(Plane(origin=(0, 2.31, 0), x_dir=(1, 0, 0), z_dir=(0, 1, 0)), mode=Mode.PRIVATE) as cut_extrude_3_sk2:
        with Locations((30, 0)):
            Circle(SKETCH_9_R)
    cut_extrude_3_tool2 = extrude(cut_extrude_3_sk2.sketch, amount=CUT_EXTRUDE_3_REACH, mode=Mode.PRIVATE) & part.part
    # 草图9 → 切除-拉伸3 (cut, up to next)
    with BuildSketch(Plane(origin=(0, 2.31, 0), x_dir=(1, 0, 0), z_dir=(0, 1, 0)), mode=Mode.PRIVATE) as cut_extrude_3_sk3:
        with Locations((60, 0)):
            Circle(SKETCH_9_R)
    cut_extrude_3_tool3 = extrude(cut_extrude_3_sk3.sketch, amount=CUT_EXTRUDE_3_REACH, mode=Mode.PRIVATE) & part.part
    # 草图9 → 切除-拉伸3 (cut, up to next)
    with BuildSketch(Plane(origin=(0, 2.31, 0), x_dir=(1, 0, 0), z_dir=(0, 1, 0)), mode=Mode.PRIVATE) as cut_extrude_3_sk4:
        with Locations((60, -43)):
            Circle(SKETCH_9_R)
    cut_extrude_3_tool4 = extrude(cut_extrude_3_sk4.sketch, amount=CUT_EXTRUDE_3_REACH, mode=Mode.PRIVATE) & part.part
    # 草图9 → 切除-拉伸3 (cut, up to next)
    with BuildSketch(Plane(origin=(0, 2.31, 0), x_dir=(1, 0, 0), z_dir=(0, 1, 0)), mode=Mode.PRIVATE) as cut_extrude_3_sk5:
        with Locations((30, -43)):
            Circle(SKETCH_9_R)
    cut_extrude_3_tool5 = extrude(cut_extrude_3_sk5.sketch, amount=CUT_EXTRUDE_3_REACH, mode=Mode.PRIVATE) & part.part
    # 草图9 → 切除-拉伸3 (cut, up to next)
    with BuildSketch(Plane(origin=(0, 2.31, 0), x_dir=(1, 0, 0), z_dir=(0, 1, 0)), mode=Mode.PRIVATE) as cut_extrude_3_sk6:
        with Locations((0, -43)):
            Circle(SKETCH_9_R)
    cut_extrude_3_tool6 = extrude(cut_extrude_3_sk6.sketch, amount=CUT_EXTRUDE_3_REACH, mode=Mode.PRIVATE) & part.part
    add(cut_extrude_3_tool1.solids().sort_by_distance((0, 2.31, 0))[0], mode=Mode.SUBTRACT)
    add(cut_extrude_3_tool2.solids().sort_by_distance((30, 2.31, 0))[0], mode=Mode.SUBTRACT)
    add(cut_extrude_3_tool3.solids().sort_by_distance((60, 2.31, 0))[0], mode=Mode.SUBTRACT)
    add(cut_extrude_3_tool4.solids().sort_by_distance((60, 2.31, 43))[0], mode=Mode.SUBTRACT)
    add(cut_extrude_3_tool5.solids().sort_by_distance((30, 2.31, 43))[0], mode=Mode.SUBTRACT)
    add(cut_extrude_3_tool6.solids().sort_by_distance((0, 2.31, 43))[0], mode=Mode.SUBTRACT)

    # 草图10 → 凸台-拉伸6 (add)
    with BuildSketch(Plane.XZ.offset(-3.81)):
        with BuildLine():
            Line((44.25, 37.25), (18.75, 37.25))
            ThreePointArc((18.75, 37.25), (14.153805922, 35.346194078), (12.25, 30.75))
            Line((12.25, 30.75), (12.25, 11.25))
            ThreePointArc((12.25, 11.25), (14.153805922, 6.653805922), (18.75, 4.75))
            Line((18.75, 4.75), (44.25, 4.75))
            ThreePointArc((44.25, 4.75), (48.846194078, 6.653805922), (50.75, 11.25))
            Line((50.75, 11.25), (50.75, 30.75))
            ThreePointArc((50.75, 30.75), (48.846194078, 35.346194078), (44.25, 37.25))
        make_face()
        with BuildLine():
            Line((47.55, 11.25), (47.55, 30.75))
            ThreePointArc((47.55, 30.75), (46.583452378, 33.083452378), (44.25, 34.05))
            Line((44.25, 34.05), (18.75, 34.05))
            ThreePointArc((18.75, 34.05), (16.416547622, 33.083452378), (15.45, 30.75))
            Line((15.45, 30.75), (15.45, 11.25))
            ThreePointArc((15.45, 11.25), (16.416547622, 8.916547622), (18.75, 7.95))
            Line((18.75, 7.95), (44.25, 7.95))
            ThreePointArc((44.25, 7.95), (46.583452378, 8.916547622), (47.55, 11.25))
        make_face(mode=Mode.SUBTRACT)
    extrude(amount=EXTRUDE_6_DEPTH)


solid = part.part
